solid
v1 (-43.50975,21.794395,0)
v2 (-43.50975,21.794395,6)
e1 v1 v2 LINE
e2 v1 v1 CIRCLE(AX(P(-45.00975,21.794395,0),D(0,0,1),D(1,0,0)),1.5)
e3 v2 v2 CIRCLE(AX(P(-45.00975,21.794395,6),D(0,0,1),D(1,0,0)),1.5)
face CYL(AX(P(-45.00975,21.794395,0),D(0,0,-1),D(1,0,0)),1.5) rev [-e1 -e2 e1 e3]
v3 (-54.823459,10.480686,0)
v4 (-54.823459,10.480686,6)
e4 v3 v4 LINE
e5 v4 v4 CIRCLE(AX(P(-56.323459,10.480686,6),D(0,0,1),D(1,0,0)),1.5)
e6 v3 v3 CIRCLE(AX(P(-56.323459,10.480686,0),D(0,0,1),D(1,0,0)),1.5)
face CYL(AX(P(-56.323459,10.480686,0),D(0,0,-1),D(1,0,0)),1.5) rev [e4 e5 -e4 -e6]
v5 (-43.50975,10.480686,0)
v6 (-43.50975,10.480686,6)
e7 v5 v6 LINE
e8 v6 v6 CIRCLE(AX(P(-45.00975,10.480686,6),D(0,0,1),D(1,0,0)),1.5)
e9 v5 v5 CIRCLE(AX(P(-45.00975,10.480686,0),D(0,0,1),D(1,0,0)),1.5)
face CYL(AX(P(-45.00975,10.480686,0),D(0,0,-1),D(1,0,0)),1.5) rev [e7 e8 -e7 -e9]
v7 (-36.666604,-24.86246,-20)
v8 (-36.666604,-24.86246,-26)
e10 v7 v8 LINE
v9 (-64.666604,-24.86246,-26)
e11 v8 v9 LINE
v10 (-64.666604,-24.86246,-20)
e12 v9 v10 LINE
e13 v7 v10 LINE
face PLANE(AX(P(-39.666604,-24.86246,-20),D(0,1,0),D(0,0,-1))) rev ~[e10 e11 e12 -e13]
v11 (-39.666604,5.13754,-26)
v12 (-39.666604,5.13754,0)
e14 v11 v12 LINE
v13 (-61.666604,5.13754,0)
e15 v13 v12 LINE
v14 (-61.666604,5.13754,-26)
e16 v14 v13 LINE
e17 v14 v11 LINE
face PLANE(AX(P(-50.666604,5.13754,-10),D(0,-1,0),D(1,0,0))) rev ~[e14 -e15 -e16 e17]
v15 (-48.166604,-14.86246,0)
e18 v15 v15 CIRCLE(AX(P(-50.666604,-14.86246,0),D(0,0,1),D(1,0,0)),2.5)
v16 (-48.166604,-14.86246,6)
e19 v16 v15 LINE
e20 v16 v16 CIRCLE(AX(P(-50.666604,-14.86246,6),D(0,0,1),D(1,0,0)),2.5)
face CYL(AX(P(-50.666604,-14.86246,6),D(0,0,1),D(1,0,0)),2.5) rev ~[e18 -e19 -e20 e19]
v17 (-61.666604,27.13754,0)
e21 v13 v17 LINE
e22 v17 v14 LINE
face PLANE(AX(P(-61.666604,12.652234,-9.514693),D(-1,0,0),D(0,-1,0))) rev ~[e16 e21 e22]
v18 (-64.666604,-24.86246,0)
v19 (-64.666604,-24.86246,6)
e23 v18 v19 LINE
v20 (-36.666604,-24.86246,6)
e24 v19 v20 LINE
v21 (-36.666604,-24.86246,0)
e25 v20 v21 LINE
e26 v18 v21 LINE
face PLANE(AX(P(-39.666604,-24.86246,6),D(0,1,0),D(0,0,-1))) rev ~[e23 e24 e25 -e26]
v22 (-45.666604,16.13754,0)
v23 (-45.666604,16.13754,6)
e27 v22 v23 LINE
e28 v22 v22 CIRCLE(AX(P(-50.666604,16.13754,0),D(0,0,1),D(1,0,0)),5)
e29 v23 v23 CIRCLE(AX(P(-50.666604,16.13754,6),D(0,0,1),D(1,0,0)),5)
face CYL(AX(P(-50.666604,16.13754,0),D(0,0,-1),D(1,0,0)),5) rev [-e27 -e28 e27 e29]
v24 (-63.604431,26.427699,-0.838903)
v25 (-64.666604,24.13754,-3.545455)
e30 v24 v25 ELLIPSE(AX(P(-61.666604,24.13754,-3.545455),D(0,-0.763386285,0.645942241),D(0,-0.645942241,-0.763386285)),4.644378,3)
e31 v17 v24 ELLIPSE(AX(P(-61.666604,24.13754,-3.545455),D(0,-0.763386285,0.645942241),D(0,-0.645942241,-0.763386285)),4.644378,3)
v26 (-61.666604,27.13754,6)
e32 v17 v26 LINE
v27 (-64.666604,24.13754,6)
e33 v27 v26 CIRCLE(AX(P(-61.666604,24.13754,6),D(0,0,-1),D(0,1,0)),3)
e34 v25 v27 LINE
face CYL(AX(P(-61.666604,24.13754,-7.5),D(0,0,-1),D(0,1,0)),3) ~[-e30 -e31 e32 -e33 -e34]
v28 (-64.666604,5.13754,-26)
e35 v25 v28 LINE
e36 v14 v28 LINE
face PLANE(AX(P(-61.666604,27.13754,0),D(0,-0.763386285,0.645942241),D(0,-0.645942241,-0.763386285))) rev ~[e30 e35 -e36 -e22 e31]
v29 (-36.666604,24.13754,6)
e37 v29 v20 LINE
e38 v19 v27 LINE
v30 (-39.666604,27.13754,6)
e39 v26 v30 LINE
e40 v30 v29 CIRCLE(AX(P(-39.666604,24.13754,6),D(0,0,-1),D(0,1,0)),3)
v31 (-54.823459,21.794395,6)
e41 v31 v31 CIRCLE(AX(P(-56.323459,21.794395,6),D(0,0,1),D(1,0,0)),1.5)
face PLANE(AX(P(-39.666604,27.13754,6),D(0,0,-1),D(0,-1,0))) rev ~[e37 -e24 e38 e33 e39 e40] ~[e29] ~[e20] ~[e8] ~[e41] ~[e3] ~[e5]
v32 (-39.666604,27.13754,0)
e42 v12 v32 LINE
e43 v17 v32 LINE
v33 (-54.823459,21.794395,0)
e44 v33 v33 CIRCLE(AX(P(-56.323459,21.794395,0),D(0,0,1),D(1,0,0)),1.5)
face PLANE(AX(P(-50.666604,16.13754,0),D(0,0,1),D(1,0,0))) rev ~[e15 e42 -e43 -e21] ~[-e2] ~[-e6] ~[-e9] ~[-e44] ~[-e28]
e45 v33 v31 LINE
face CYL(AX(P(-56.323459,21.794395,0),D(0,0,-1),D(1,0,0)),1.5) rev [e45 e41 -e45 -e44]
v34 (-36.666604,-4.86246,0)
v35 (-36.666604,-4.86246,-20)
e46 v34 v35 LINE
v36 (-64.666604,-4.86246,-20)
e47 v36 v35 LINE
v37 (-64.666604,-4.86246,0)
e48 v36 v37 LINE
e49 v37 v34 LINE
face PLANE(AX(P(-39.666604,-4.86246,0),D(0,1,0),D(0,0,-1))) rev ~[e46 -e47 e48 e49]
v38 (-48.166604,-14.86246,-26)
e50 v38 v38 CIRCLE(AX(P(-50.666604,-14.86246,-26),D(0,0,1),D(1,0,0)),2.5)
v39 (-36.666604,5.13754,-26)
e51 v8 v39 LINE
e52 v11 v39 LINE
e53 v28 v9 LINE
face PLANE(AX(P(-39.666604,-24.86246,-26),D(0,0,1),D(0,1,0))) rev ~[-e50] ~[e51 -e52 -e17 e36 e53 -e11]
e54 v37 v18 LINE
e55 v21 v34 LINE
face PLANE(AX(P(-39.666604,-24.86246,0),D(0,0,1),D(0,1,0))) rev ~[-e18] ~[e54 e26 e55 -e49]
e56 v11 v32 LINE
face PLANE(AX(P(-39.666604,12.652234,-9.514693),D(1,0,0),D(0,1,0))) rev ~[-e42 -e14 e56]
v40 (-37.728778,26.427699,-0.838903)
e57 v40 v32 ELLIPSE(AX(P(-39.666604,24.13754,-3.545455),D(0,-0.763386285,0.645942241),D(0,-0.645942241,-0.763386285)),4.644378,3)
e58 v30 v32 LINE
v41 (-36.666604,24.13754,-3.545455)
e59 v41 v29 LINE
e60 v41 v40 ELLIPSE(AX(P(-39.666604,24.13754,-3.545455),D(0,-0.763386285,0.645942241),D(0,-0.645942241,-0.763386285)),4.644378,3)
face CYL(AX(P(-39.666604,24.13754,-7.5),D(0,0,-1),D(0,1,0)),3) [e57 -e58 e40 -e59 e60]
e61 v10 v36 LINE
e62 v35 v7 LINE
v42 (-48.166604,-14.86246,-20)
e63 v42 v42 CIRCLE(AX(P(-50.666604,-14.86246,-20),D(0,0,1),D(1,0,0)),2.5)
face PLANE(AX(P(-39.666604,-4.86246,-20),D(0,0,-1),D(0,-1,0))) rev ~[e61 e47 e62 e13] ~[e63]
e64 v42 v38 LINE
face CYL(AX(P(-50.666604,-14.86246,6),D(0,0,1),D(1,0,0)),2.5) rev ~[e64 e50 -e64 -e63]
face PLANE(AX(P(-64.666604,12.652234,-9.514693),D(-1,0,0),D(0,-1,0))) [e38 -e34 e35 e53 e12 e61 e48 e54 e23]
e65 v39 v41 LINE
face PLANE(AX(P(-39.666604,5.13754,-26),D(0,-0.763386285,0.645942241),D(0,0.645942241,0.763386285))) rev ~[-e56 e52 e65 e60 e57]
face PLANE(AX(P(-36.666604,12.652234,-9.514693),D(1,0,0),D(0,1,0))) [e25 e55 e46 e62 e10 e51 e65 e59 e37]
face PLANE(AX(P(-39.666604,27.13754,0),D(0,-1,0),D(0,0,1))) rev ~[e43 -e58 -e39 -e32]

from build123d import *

# Parameters (mm, degrees)
F0_W          = 22
F0_H          = 22
F0_R          = 1.5
F0_R_2        = 5
F1_DEPTH      = 6
F2_W          = 22
F2_H          = 32
F3_DEPTH      = 10
F4_W          = 22
F4_H          = 6
F5_DEPTH      = 20
F6_R          = 2.5
F7_DEPTH      = 32.001
F9_DEPTH      = 3
F11_DEPTH     = 3
F12_T1_DEPTH  = 21
F12_T6_DEPTH  = 5.7473088859
F12_S7_R      = 3
F12_T8_DEPTH  = 5
F12_T12_DEPTH = 5.7473088859
F12_S13_R     = 3
F12_T14_DEPTH = 5


# Not quite as in the source:
# - a fillet or chamfer that OpenCascade refuses, or shapes differently, is made with other operations: its cross-section is extruded or revolved along the edge and cut away or added
# - a feature of the source that left no trace in its solid (it failed there, or was rolled back) is left out


with BuildPart() as f1:
    # F0 (on Top) → F1 (new body)
    with BuildSketch(Plane.XY):
        with Locations((-50.6666042507, 16.1375404)):
            Rectangle(F0_W, F0_H)
        with Locations((-56.3234585002, 10.4806861505)):
            Circle(F0_R, mode=Mode.SUBTRACT)
        with Locations((-45.0097500012, 10.4806861505)):
            Circle(F0_R, mode=Mode.SUBTRACT)
        with Locations((-50.6666042507, 16.1375404)):
            Circle(F0_R_2, mode=Mode.SUBTRACT)
        with Locations((-56.3234585002, 21.7943946495)):
            Circle(F0_R, mode=Mode.SUBTRACT)
        with Locations((-45.0097500012, 21.7943946495)):
            Circle(F0_R, mode=Mode.SUBTRACT)
    extrude(amount=F1_DEPTH)

    # F2 (on face) → F3 (join)
    with BuildSketch(Plane.XZ.offset(-5.1375404)):
        with Locations((-50.6666042507, -10)):
            Rectangle(F2_W, F2_H)
    extrude(amount=F3_DEPTH)

    # F4 (on face) → F5 (join)
    with BuildSketch(Plane.XZ.offset(4.8624596)):
        with Locations((-50.6666042507, 3)):
            Rectangle(F4_W, F4_H)
        with Locations((-50.6666042507, -23)):
            Rectangle(F4_W, F4_H)
    extrude(amount=F5_DEPTH)

    # F6 (on face) → F7 (cut, through all)
    with BuildSketch(Plane.XY.offset(6)):
        with Locations((-50.6666042507, -14.8624596)):
            Circle(F6_R)
    extrude(amount=-F7_DEPTH, mode=Mode.SUBTRACT)

    # F8 (on face) → F9 (join)
    with BuildSketch(Plane(origin=(-61.6666042507, 0, 0), x_dir=(0, -1, 0), z_dir=(-1, 0, 0))):
        Polygon((-27.1375404, 0), (-5.1375404, -26), (-5.1375404, 0), align=None)
        Polygon((-5.1375404, 0), (-5.1375404, -26), (24.8624596, -26), (24.8624596, -20), (4.8624596, -20), (4.8624596, 0), (24.8624596, 0), (24.8624596, 6), (-27.1375404, 6), (-27.1375404, 0), align=None)
    extrude(amount=F9_DEPTH)

    # F10 (on face) → F11 (join)
    with BuildSketch(Plane.YZ.offset(-39.6666042507)):
        Polygon((5.1375404, 0), (5.1375404, -26), (27.1375404, 0), align=None)
        Polygon((-24.8624596, -26), (5.1375404, -26), (5.1375404, 0), (27.1375404, 0), (27.1375404, 6), (-24.8624596, 6), (-24.8624596, 0), (-4.8624596, 0), (-4.8624596, -20), (-24.8624596, -20), align=None)
    extrude(amount=F11_DEPTH)

    # F12: fillet of radius 3 on 4 edges, made by hand

    # F12_s2 → F12_t1 (cut)
    with BuildSketch(Plane.XY.offset(-7.5)):
        with BuildLine():
            ThreePointArc((-61.6666042507, 27.1375404), (-63.7879245942, 26.2588607436), (-64.6666042507, 24.1375404))
            Line((-64.6666042507, 24.1375404), (-64.6666042507, 27.1375404))
            Line((-64.6666042507, 27.1375404), (-61.6666042507, 27.1375404))
        make_face()
        with BuildLine():
            ThreePointArc((-39.6666042507, 27.1375404), (-37.5452839071, 26.2588607436), (-36.6666042507, 24.1375404))
            Line((-36.6666042507, 24.1375404), (-36.6666042507, 27.1375404))
            Line((-36.6666042507, 27.1375404), (-39.6666042507, 27.1375404))
        make_face()
    extrude(amount=F12_T1_DEPTH, mode=Mode.SUBTRACT)


with BuildPart() as f12_tool4:
    # F12_s5 → F12_t6 (new body)
    with BuildSketch(Plane.YZ.offset(-61.6666042507)):
        with BuildLine():
            ThreePointArc((27.1375404, 1.0989235543), (26.9544958992, 0.0670506378), (26.4276992561, -0.8389031701))
            Line((26.4276992561, -0.8389031701), (27.1375404, 0))
            Line((27.1375404, 0), (27.1375404, 1.0989235543))
        make_face()
    extrude(amount=-F12_T6_DEPTH)

    # F12_s7 → F12_t8 (cut, symmetric)
    with BuildSketch(Plane.XY.offset(0.1)):
        with Locations((-61.6666042507, 24.1375404)):
            Circle(F12_S7_R)
    extrude(amount=F12_T8_DEPTH, both=True, mode=Mode.SUBTRACT)


with BuildPart() as f1_1:
    add(f1.part)

    # F12_t3: cut F12_tool4
    add(f12_tool4.part, mode=Mode.SUBTRACT)


with BuildPart() as f12_tool10:
    # F12_s11 → F12_t12 (new body)
    with BuildSketch(Plane.YZ.offset(-39.6666042507)):
        with BuildLine():
            ThreePointArc((27.1375404, 1.0989235543), (26.9544958992, 0.0670506378), (26.4276992561, -0.8389031701))
            Line((26.4276992561, -0.8389031701), (27.1375404, 0))
            Line((27.1375404, 0), (27.1375404, 1.0989235543))
        make_face()
    extrude(amount=F12_T12_DEPTH)

    # F12_s13 → F12_t14 (cut, symmetric)
    with BuildSketch(Plane.XY.offset(0.1)):
        with Locations((-39.6666042507, 24.1375404)):
            Circle(F12_S13_R)
    extrude(amount=F12_T14_DEPTH, both=True, mode=Mode.SUBTRACT)


with BuildPart() as f1_2:
    add(f1_1.part)

    # F12_t9: cut F12_tool10
    add(f12_tool10.part, mode=Mode.SUBTRACT)


solid = f1_2.part
